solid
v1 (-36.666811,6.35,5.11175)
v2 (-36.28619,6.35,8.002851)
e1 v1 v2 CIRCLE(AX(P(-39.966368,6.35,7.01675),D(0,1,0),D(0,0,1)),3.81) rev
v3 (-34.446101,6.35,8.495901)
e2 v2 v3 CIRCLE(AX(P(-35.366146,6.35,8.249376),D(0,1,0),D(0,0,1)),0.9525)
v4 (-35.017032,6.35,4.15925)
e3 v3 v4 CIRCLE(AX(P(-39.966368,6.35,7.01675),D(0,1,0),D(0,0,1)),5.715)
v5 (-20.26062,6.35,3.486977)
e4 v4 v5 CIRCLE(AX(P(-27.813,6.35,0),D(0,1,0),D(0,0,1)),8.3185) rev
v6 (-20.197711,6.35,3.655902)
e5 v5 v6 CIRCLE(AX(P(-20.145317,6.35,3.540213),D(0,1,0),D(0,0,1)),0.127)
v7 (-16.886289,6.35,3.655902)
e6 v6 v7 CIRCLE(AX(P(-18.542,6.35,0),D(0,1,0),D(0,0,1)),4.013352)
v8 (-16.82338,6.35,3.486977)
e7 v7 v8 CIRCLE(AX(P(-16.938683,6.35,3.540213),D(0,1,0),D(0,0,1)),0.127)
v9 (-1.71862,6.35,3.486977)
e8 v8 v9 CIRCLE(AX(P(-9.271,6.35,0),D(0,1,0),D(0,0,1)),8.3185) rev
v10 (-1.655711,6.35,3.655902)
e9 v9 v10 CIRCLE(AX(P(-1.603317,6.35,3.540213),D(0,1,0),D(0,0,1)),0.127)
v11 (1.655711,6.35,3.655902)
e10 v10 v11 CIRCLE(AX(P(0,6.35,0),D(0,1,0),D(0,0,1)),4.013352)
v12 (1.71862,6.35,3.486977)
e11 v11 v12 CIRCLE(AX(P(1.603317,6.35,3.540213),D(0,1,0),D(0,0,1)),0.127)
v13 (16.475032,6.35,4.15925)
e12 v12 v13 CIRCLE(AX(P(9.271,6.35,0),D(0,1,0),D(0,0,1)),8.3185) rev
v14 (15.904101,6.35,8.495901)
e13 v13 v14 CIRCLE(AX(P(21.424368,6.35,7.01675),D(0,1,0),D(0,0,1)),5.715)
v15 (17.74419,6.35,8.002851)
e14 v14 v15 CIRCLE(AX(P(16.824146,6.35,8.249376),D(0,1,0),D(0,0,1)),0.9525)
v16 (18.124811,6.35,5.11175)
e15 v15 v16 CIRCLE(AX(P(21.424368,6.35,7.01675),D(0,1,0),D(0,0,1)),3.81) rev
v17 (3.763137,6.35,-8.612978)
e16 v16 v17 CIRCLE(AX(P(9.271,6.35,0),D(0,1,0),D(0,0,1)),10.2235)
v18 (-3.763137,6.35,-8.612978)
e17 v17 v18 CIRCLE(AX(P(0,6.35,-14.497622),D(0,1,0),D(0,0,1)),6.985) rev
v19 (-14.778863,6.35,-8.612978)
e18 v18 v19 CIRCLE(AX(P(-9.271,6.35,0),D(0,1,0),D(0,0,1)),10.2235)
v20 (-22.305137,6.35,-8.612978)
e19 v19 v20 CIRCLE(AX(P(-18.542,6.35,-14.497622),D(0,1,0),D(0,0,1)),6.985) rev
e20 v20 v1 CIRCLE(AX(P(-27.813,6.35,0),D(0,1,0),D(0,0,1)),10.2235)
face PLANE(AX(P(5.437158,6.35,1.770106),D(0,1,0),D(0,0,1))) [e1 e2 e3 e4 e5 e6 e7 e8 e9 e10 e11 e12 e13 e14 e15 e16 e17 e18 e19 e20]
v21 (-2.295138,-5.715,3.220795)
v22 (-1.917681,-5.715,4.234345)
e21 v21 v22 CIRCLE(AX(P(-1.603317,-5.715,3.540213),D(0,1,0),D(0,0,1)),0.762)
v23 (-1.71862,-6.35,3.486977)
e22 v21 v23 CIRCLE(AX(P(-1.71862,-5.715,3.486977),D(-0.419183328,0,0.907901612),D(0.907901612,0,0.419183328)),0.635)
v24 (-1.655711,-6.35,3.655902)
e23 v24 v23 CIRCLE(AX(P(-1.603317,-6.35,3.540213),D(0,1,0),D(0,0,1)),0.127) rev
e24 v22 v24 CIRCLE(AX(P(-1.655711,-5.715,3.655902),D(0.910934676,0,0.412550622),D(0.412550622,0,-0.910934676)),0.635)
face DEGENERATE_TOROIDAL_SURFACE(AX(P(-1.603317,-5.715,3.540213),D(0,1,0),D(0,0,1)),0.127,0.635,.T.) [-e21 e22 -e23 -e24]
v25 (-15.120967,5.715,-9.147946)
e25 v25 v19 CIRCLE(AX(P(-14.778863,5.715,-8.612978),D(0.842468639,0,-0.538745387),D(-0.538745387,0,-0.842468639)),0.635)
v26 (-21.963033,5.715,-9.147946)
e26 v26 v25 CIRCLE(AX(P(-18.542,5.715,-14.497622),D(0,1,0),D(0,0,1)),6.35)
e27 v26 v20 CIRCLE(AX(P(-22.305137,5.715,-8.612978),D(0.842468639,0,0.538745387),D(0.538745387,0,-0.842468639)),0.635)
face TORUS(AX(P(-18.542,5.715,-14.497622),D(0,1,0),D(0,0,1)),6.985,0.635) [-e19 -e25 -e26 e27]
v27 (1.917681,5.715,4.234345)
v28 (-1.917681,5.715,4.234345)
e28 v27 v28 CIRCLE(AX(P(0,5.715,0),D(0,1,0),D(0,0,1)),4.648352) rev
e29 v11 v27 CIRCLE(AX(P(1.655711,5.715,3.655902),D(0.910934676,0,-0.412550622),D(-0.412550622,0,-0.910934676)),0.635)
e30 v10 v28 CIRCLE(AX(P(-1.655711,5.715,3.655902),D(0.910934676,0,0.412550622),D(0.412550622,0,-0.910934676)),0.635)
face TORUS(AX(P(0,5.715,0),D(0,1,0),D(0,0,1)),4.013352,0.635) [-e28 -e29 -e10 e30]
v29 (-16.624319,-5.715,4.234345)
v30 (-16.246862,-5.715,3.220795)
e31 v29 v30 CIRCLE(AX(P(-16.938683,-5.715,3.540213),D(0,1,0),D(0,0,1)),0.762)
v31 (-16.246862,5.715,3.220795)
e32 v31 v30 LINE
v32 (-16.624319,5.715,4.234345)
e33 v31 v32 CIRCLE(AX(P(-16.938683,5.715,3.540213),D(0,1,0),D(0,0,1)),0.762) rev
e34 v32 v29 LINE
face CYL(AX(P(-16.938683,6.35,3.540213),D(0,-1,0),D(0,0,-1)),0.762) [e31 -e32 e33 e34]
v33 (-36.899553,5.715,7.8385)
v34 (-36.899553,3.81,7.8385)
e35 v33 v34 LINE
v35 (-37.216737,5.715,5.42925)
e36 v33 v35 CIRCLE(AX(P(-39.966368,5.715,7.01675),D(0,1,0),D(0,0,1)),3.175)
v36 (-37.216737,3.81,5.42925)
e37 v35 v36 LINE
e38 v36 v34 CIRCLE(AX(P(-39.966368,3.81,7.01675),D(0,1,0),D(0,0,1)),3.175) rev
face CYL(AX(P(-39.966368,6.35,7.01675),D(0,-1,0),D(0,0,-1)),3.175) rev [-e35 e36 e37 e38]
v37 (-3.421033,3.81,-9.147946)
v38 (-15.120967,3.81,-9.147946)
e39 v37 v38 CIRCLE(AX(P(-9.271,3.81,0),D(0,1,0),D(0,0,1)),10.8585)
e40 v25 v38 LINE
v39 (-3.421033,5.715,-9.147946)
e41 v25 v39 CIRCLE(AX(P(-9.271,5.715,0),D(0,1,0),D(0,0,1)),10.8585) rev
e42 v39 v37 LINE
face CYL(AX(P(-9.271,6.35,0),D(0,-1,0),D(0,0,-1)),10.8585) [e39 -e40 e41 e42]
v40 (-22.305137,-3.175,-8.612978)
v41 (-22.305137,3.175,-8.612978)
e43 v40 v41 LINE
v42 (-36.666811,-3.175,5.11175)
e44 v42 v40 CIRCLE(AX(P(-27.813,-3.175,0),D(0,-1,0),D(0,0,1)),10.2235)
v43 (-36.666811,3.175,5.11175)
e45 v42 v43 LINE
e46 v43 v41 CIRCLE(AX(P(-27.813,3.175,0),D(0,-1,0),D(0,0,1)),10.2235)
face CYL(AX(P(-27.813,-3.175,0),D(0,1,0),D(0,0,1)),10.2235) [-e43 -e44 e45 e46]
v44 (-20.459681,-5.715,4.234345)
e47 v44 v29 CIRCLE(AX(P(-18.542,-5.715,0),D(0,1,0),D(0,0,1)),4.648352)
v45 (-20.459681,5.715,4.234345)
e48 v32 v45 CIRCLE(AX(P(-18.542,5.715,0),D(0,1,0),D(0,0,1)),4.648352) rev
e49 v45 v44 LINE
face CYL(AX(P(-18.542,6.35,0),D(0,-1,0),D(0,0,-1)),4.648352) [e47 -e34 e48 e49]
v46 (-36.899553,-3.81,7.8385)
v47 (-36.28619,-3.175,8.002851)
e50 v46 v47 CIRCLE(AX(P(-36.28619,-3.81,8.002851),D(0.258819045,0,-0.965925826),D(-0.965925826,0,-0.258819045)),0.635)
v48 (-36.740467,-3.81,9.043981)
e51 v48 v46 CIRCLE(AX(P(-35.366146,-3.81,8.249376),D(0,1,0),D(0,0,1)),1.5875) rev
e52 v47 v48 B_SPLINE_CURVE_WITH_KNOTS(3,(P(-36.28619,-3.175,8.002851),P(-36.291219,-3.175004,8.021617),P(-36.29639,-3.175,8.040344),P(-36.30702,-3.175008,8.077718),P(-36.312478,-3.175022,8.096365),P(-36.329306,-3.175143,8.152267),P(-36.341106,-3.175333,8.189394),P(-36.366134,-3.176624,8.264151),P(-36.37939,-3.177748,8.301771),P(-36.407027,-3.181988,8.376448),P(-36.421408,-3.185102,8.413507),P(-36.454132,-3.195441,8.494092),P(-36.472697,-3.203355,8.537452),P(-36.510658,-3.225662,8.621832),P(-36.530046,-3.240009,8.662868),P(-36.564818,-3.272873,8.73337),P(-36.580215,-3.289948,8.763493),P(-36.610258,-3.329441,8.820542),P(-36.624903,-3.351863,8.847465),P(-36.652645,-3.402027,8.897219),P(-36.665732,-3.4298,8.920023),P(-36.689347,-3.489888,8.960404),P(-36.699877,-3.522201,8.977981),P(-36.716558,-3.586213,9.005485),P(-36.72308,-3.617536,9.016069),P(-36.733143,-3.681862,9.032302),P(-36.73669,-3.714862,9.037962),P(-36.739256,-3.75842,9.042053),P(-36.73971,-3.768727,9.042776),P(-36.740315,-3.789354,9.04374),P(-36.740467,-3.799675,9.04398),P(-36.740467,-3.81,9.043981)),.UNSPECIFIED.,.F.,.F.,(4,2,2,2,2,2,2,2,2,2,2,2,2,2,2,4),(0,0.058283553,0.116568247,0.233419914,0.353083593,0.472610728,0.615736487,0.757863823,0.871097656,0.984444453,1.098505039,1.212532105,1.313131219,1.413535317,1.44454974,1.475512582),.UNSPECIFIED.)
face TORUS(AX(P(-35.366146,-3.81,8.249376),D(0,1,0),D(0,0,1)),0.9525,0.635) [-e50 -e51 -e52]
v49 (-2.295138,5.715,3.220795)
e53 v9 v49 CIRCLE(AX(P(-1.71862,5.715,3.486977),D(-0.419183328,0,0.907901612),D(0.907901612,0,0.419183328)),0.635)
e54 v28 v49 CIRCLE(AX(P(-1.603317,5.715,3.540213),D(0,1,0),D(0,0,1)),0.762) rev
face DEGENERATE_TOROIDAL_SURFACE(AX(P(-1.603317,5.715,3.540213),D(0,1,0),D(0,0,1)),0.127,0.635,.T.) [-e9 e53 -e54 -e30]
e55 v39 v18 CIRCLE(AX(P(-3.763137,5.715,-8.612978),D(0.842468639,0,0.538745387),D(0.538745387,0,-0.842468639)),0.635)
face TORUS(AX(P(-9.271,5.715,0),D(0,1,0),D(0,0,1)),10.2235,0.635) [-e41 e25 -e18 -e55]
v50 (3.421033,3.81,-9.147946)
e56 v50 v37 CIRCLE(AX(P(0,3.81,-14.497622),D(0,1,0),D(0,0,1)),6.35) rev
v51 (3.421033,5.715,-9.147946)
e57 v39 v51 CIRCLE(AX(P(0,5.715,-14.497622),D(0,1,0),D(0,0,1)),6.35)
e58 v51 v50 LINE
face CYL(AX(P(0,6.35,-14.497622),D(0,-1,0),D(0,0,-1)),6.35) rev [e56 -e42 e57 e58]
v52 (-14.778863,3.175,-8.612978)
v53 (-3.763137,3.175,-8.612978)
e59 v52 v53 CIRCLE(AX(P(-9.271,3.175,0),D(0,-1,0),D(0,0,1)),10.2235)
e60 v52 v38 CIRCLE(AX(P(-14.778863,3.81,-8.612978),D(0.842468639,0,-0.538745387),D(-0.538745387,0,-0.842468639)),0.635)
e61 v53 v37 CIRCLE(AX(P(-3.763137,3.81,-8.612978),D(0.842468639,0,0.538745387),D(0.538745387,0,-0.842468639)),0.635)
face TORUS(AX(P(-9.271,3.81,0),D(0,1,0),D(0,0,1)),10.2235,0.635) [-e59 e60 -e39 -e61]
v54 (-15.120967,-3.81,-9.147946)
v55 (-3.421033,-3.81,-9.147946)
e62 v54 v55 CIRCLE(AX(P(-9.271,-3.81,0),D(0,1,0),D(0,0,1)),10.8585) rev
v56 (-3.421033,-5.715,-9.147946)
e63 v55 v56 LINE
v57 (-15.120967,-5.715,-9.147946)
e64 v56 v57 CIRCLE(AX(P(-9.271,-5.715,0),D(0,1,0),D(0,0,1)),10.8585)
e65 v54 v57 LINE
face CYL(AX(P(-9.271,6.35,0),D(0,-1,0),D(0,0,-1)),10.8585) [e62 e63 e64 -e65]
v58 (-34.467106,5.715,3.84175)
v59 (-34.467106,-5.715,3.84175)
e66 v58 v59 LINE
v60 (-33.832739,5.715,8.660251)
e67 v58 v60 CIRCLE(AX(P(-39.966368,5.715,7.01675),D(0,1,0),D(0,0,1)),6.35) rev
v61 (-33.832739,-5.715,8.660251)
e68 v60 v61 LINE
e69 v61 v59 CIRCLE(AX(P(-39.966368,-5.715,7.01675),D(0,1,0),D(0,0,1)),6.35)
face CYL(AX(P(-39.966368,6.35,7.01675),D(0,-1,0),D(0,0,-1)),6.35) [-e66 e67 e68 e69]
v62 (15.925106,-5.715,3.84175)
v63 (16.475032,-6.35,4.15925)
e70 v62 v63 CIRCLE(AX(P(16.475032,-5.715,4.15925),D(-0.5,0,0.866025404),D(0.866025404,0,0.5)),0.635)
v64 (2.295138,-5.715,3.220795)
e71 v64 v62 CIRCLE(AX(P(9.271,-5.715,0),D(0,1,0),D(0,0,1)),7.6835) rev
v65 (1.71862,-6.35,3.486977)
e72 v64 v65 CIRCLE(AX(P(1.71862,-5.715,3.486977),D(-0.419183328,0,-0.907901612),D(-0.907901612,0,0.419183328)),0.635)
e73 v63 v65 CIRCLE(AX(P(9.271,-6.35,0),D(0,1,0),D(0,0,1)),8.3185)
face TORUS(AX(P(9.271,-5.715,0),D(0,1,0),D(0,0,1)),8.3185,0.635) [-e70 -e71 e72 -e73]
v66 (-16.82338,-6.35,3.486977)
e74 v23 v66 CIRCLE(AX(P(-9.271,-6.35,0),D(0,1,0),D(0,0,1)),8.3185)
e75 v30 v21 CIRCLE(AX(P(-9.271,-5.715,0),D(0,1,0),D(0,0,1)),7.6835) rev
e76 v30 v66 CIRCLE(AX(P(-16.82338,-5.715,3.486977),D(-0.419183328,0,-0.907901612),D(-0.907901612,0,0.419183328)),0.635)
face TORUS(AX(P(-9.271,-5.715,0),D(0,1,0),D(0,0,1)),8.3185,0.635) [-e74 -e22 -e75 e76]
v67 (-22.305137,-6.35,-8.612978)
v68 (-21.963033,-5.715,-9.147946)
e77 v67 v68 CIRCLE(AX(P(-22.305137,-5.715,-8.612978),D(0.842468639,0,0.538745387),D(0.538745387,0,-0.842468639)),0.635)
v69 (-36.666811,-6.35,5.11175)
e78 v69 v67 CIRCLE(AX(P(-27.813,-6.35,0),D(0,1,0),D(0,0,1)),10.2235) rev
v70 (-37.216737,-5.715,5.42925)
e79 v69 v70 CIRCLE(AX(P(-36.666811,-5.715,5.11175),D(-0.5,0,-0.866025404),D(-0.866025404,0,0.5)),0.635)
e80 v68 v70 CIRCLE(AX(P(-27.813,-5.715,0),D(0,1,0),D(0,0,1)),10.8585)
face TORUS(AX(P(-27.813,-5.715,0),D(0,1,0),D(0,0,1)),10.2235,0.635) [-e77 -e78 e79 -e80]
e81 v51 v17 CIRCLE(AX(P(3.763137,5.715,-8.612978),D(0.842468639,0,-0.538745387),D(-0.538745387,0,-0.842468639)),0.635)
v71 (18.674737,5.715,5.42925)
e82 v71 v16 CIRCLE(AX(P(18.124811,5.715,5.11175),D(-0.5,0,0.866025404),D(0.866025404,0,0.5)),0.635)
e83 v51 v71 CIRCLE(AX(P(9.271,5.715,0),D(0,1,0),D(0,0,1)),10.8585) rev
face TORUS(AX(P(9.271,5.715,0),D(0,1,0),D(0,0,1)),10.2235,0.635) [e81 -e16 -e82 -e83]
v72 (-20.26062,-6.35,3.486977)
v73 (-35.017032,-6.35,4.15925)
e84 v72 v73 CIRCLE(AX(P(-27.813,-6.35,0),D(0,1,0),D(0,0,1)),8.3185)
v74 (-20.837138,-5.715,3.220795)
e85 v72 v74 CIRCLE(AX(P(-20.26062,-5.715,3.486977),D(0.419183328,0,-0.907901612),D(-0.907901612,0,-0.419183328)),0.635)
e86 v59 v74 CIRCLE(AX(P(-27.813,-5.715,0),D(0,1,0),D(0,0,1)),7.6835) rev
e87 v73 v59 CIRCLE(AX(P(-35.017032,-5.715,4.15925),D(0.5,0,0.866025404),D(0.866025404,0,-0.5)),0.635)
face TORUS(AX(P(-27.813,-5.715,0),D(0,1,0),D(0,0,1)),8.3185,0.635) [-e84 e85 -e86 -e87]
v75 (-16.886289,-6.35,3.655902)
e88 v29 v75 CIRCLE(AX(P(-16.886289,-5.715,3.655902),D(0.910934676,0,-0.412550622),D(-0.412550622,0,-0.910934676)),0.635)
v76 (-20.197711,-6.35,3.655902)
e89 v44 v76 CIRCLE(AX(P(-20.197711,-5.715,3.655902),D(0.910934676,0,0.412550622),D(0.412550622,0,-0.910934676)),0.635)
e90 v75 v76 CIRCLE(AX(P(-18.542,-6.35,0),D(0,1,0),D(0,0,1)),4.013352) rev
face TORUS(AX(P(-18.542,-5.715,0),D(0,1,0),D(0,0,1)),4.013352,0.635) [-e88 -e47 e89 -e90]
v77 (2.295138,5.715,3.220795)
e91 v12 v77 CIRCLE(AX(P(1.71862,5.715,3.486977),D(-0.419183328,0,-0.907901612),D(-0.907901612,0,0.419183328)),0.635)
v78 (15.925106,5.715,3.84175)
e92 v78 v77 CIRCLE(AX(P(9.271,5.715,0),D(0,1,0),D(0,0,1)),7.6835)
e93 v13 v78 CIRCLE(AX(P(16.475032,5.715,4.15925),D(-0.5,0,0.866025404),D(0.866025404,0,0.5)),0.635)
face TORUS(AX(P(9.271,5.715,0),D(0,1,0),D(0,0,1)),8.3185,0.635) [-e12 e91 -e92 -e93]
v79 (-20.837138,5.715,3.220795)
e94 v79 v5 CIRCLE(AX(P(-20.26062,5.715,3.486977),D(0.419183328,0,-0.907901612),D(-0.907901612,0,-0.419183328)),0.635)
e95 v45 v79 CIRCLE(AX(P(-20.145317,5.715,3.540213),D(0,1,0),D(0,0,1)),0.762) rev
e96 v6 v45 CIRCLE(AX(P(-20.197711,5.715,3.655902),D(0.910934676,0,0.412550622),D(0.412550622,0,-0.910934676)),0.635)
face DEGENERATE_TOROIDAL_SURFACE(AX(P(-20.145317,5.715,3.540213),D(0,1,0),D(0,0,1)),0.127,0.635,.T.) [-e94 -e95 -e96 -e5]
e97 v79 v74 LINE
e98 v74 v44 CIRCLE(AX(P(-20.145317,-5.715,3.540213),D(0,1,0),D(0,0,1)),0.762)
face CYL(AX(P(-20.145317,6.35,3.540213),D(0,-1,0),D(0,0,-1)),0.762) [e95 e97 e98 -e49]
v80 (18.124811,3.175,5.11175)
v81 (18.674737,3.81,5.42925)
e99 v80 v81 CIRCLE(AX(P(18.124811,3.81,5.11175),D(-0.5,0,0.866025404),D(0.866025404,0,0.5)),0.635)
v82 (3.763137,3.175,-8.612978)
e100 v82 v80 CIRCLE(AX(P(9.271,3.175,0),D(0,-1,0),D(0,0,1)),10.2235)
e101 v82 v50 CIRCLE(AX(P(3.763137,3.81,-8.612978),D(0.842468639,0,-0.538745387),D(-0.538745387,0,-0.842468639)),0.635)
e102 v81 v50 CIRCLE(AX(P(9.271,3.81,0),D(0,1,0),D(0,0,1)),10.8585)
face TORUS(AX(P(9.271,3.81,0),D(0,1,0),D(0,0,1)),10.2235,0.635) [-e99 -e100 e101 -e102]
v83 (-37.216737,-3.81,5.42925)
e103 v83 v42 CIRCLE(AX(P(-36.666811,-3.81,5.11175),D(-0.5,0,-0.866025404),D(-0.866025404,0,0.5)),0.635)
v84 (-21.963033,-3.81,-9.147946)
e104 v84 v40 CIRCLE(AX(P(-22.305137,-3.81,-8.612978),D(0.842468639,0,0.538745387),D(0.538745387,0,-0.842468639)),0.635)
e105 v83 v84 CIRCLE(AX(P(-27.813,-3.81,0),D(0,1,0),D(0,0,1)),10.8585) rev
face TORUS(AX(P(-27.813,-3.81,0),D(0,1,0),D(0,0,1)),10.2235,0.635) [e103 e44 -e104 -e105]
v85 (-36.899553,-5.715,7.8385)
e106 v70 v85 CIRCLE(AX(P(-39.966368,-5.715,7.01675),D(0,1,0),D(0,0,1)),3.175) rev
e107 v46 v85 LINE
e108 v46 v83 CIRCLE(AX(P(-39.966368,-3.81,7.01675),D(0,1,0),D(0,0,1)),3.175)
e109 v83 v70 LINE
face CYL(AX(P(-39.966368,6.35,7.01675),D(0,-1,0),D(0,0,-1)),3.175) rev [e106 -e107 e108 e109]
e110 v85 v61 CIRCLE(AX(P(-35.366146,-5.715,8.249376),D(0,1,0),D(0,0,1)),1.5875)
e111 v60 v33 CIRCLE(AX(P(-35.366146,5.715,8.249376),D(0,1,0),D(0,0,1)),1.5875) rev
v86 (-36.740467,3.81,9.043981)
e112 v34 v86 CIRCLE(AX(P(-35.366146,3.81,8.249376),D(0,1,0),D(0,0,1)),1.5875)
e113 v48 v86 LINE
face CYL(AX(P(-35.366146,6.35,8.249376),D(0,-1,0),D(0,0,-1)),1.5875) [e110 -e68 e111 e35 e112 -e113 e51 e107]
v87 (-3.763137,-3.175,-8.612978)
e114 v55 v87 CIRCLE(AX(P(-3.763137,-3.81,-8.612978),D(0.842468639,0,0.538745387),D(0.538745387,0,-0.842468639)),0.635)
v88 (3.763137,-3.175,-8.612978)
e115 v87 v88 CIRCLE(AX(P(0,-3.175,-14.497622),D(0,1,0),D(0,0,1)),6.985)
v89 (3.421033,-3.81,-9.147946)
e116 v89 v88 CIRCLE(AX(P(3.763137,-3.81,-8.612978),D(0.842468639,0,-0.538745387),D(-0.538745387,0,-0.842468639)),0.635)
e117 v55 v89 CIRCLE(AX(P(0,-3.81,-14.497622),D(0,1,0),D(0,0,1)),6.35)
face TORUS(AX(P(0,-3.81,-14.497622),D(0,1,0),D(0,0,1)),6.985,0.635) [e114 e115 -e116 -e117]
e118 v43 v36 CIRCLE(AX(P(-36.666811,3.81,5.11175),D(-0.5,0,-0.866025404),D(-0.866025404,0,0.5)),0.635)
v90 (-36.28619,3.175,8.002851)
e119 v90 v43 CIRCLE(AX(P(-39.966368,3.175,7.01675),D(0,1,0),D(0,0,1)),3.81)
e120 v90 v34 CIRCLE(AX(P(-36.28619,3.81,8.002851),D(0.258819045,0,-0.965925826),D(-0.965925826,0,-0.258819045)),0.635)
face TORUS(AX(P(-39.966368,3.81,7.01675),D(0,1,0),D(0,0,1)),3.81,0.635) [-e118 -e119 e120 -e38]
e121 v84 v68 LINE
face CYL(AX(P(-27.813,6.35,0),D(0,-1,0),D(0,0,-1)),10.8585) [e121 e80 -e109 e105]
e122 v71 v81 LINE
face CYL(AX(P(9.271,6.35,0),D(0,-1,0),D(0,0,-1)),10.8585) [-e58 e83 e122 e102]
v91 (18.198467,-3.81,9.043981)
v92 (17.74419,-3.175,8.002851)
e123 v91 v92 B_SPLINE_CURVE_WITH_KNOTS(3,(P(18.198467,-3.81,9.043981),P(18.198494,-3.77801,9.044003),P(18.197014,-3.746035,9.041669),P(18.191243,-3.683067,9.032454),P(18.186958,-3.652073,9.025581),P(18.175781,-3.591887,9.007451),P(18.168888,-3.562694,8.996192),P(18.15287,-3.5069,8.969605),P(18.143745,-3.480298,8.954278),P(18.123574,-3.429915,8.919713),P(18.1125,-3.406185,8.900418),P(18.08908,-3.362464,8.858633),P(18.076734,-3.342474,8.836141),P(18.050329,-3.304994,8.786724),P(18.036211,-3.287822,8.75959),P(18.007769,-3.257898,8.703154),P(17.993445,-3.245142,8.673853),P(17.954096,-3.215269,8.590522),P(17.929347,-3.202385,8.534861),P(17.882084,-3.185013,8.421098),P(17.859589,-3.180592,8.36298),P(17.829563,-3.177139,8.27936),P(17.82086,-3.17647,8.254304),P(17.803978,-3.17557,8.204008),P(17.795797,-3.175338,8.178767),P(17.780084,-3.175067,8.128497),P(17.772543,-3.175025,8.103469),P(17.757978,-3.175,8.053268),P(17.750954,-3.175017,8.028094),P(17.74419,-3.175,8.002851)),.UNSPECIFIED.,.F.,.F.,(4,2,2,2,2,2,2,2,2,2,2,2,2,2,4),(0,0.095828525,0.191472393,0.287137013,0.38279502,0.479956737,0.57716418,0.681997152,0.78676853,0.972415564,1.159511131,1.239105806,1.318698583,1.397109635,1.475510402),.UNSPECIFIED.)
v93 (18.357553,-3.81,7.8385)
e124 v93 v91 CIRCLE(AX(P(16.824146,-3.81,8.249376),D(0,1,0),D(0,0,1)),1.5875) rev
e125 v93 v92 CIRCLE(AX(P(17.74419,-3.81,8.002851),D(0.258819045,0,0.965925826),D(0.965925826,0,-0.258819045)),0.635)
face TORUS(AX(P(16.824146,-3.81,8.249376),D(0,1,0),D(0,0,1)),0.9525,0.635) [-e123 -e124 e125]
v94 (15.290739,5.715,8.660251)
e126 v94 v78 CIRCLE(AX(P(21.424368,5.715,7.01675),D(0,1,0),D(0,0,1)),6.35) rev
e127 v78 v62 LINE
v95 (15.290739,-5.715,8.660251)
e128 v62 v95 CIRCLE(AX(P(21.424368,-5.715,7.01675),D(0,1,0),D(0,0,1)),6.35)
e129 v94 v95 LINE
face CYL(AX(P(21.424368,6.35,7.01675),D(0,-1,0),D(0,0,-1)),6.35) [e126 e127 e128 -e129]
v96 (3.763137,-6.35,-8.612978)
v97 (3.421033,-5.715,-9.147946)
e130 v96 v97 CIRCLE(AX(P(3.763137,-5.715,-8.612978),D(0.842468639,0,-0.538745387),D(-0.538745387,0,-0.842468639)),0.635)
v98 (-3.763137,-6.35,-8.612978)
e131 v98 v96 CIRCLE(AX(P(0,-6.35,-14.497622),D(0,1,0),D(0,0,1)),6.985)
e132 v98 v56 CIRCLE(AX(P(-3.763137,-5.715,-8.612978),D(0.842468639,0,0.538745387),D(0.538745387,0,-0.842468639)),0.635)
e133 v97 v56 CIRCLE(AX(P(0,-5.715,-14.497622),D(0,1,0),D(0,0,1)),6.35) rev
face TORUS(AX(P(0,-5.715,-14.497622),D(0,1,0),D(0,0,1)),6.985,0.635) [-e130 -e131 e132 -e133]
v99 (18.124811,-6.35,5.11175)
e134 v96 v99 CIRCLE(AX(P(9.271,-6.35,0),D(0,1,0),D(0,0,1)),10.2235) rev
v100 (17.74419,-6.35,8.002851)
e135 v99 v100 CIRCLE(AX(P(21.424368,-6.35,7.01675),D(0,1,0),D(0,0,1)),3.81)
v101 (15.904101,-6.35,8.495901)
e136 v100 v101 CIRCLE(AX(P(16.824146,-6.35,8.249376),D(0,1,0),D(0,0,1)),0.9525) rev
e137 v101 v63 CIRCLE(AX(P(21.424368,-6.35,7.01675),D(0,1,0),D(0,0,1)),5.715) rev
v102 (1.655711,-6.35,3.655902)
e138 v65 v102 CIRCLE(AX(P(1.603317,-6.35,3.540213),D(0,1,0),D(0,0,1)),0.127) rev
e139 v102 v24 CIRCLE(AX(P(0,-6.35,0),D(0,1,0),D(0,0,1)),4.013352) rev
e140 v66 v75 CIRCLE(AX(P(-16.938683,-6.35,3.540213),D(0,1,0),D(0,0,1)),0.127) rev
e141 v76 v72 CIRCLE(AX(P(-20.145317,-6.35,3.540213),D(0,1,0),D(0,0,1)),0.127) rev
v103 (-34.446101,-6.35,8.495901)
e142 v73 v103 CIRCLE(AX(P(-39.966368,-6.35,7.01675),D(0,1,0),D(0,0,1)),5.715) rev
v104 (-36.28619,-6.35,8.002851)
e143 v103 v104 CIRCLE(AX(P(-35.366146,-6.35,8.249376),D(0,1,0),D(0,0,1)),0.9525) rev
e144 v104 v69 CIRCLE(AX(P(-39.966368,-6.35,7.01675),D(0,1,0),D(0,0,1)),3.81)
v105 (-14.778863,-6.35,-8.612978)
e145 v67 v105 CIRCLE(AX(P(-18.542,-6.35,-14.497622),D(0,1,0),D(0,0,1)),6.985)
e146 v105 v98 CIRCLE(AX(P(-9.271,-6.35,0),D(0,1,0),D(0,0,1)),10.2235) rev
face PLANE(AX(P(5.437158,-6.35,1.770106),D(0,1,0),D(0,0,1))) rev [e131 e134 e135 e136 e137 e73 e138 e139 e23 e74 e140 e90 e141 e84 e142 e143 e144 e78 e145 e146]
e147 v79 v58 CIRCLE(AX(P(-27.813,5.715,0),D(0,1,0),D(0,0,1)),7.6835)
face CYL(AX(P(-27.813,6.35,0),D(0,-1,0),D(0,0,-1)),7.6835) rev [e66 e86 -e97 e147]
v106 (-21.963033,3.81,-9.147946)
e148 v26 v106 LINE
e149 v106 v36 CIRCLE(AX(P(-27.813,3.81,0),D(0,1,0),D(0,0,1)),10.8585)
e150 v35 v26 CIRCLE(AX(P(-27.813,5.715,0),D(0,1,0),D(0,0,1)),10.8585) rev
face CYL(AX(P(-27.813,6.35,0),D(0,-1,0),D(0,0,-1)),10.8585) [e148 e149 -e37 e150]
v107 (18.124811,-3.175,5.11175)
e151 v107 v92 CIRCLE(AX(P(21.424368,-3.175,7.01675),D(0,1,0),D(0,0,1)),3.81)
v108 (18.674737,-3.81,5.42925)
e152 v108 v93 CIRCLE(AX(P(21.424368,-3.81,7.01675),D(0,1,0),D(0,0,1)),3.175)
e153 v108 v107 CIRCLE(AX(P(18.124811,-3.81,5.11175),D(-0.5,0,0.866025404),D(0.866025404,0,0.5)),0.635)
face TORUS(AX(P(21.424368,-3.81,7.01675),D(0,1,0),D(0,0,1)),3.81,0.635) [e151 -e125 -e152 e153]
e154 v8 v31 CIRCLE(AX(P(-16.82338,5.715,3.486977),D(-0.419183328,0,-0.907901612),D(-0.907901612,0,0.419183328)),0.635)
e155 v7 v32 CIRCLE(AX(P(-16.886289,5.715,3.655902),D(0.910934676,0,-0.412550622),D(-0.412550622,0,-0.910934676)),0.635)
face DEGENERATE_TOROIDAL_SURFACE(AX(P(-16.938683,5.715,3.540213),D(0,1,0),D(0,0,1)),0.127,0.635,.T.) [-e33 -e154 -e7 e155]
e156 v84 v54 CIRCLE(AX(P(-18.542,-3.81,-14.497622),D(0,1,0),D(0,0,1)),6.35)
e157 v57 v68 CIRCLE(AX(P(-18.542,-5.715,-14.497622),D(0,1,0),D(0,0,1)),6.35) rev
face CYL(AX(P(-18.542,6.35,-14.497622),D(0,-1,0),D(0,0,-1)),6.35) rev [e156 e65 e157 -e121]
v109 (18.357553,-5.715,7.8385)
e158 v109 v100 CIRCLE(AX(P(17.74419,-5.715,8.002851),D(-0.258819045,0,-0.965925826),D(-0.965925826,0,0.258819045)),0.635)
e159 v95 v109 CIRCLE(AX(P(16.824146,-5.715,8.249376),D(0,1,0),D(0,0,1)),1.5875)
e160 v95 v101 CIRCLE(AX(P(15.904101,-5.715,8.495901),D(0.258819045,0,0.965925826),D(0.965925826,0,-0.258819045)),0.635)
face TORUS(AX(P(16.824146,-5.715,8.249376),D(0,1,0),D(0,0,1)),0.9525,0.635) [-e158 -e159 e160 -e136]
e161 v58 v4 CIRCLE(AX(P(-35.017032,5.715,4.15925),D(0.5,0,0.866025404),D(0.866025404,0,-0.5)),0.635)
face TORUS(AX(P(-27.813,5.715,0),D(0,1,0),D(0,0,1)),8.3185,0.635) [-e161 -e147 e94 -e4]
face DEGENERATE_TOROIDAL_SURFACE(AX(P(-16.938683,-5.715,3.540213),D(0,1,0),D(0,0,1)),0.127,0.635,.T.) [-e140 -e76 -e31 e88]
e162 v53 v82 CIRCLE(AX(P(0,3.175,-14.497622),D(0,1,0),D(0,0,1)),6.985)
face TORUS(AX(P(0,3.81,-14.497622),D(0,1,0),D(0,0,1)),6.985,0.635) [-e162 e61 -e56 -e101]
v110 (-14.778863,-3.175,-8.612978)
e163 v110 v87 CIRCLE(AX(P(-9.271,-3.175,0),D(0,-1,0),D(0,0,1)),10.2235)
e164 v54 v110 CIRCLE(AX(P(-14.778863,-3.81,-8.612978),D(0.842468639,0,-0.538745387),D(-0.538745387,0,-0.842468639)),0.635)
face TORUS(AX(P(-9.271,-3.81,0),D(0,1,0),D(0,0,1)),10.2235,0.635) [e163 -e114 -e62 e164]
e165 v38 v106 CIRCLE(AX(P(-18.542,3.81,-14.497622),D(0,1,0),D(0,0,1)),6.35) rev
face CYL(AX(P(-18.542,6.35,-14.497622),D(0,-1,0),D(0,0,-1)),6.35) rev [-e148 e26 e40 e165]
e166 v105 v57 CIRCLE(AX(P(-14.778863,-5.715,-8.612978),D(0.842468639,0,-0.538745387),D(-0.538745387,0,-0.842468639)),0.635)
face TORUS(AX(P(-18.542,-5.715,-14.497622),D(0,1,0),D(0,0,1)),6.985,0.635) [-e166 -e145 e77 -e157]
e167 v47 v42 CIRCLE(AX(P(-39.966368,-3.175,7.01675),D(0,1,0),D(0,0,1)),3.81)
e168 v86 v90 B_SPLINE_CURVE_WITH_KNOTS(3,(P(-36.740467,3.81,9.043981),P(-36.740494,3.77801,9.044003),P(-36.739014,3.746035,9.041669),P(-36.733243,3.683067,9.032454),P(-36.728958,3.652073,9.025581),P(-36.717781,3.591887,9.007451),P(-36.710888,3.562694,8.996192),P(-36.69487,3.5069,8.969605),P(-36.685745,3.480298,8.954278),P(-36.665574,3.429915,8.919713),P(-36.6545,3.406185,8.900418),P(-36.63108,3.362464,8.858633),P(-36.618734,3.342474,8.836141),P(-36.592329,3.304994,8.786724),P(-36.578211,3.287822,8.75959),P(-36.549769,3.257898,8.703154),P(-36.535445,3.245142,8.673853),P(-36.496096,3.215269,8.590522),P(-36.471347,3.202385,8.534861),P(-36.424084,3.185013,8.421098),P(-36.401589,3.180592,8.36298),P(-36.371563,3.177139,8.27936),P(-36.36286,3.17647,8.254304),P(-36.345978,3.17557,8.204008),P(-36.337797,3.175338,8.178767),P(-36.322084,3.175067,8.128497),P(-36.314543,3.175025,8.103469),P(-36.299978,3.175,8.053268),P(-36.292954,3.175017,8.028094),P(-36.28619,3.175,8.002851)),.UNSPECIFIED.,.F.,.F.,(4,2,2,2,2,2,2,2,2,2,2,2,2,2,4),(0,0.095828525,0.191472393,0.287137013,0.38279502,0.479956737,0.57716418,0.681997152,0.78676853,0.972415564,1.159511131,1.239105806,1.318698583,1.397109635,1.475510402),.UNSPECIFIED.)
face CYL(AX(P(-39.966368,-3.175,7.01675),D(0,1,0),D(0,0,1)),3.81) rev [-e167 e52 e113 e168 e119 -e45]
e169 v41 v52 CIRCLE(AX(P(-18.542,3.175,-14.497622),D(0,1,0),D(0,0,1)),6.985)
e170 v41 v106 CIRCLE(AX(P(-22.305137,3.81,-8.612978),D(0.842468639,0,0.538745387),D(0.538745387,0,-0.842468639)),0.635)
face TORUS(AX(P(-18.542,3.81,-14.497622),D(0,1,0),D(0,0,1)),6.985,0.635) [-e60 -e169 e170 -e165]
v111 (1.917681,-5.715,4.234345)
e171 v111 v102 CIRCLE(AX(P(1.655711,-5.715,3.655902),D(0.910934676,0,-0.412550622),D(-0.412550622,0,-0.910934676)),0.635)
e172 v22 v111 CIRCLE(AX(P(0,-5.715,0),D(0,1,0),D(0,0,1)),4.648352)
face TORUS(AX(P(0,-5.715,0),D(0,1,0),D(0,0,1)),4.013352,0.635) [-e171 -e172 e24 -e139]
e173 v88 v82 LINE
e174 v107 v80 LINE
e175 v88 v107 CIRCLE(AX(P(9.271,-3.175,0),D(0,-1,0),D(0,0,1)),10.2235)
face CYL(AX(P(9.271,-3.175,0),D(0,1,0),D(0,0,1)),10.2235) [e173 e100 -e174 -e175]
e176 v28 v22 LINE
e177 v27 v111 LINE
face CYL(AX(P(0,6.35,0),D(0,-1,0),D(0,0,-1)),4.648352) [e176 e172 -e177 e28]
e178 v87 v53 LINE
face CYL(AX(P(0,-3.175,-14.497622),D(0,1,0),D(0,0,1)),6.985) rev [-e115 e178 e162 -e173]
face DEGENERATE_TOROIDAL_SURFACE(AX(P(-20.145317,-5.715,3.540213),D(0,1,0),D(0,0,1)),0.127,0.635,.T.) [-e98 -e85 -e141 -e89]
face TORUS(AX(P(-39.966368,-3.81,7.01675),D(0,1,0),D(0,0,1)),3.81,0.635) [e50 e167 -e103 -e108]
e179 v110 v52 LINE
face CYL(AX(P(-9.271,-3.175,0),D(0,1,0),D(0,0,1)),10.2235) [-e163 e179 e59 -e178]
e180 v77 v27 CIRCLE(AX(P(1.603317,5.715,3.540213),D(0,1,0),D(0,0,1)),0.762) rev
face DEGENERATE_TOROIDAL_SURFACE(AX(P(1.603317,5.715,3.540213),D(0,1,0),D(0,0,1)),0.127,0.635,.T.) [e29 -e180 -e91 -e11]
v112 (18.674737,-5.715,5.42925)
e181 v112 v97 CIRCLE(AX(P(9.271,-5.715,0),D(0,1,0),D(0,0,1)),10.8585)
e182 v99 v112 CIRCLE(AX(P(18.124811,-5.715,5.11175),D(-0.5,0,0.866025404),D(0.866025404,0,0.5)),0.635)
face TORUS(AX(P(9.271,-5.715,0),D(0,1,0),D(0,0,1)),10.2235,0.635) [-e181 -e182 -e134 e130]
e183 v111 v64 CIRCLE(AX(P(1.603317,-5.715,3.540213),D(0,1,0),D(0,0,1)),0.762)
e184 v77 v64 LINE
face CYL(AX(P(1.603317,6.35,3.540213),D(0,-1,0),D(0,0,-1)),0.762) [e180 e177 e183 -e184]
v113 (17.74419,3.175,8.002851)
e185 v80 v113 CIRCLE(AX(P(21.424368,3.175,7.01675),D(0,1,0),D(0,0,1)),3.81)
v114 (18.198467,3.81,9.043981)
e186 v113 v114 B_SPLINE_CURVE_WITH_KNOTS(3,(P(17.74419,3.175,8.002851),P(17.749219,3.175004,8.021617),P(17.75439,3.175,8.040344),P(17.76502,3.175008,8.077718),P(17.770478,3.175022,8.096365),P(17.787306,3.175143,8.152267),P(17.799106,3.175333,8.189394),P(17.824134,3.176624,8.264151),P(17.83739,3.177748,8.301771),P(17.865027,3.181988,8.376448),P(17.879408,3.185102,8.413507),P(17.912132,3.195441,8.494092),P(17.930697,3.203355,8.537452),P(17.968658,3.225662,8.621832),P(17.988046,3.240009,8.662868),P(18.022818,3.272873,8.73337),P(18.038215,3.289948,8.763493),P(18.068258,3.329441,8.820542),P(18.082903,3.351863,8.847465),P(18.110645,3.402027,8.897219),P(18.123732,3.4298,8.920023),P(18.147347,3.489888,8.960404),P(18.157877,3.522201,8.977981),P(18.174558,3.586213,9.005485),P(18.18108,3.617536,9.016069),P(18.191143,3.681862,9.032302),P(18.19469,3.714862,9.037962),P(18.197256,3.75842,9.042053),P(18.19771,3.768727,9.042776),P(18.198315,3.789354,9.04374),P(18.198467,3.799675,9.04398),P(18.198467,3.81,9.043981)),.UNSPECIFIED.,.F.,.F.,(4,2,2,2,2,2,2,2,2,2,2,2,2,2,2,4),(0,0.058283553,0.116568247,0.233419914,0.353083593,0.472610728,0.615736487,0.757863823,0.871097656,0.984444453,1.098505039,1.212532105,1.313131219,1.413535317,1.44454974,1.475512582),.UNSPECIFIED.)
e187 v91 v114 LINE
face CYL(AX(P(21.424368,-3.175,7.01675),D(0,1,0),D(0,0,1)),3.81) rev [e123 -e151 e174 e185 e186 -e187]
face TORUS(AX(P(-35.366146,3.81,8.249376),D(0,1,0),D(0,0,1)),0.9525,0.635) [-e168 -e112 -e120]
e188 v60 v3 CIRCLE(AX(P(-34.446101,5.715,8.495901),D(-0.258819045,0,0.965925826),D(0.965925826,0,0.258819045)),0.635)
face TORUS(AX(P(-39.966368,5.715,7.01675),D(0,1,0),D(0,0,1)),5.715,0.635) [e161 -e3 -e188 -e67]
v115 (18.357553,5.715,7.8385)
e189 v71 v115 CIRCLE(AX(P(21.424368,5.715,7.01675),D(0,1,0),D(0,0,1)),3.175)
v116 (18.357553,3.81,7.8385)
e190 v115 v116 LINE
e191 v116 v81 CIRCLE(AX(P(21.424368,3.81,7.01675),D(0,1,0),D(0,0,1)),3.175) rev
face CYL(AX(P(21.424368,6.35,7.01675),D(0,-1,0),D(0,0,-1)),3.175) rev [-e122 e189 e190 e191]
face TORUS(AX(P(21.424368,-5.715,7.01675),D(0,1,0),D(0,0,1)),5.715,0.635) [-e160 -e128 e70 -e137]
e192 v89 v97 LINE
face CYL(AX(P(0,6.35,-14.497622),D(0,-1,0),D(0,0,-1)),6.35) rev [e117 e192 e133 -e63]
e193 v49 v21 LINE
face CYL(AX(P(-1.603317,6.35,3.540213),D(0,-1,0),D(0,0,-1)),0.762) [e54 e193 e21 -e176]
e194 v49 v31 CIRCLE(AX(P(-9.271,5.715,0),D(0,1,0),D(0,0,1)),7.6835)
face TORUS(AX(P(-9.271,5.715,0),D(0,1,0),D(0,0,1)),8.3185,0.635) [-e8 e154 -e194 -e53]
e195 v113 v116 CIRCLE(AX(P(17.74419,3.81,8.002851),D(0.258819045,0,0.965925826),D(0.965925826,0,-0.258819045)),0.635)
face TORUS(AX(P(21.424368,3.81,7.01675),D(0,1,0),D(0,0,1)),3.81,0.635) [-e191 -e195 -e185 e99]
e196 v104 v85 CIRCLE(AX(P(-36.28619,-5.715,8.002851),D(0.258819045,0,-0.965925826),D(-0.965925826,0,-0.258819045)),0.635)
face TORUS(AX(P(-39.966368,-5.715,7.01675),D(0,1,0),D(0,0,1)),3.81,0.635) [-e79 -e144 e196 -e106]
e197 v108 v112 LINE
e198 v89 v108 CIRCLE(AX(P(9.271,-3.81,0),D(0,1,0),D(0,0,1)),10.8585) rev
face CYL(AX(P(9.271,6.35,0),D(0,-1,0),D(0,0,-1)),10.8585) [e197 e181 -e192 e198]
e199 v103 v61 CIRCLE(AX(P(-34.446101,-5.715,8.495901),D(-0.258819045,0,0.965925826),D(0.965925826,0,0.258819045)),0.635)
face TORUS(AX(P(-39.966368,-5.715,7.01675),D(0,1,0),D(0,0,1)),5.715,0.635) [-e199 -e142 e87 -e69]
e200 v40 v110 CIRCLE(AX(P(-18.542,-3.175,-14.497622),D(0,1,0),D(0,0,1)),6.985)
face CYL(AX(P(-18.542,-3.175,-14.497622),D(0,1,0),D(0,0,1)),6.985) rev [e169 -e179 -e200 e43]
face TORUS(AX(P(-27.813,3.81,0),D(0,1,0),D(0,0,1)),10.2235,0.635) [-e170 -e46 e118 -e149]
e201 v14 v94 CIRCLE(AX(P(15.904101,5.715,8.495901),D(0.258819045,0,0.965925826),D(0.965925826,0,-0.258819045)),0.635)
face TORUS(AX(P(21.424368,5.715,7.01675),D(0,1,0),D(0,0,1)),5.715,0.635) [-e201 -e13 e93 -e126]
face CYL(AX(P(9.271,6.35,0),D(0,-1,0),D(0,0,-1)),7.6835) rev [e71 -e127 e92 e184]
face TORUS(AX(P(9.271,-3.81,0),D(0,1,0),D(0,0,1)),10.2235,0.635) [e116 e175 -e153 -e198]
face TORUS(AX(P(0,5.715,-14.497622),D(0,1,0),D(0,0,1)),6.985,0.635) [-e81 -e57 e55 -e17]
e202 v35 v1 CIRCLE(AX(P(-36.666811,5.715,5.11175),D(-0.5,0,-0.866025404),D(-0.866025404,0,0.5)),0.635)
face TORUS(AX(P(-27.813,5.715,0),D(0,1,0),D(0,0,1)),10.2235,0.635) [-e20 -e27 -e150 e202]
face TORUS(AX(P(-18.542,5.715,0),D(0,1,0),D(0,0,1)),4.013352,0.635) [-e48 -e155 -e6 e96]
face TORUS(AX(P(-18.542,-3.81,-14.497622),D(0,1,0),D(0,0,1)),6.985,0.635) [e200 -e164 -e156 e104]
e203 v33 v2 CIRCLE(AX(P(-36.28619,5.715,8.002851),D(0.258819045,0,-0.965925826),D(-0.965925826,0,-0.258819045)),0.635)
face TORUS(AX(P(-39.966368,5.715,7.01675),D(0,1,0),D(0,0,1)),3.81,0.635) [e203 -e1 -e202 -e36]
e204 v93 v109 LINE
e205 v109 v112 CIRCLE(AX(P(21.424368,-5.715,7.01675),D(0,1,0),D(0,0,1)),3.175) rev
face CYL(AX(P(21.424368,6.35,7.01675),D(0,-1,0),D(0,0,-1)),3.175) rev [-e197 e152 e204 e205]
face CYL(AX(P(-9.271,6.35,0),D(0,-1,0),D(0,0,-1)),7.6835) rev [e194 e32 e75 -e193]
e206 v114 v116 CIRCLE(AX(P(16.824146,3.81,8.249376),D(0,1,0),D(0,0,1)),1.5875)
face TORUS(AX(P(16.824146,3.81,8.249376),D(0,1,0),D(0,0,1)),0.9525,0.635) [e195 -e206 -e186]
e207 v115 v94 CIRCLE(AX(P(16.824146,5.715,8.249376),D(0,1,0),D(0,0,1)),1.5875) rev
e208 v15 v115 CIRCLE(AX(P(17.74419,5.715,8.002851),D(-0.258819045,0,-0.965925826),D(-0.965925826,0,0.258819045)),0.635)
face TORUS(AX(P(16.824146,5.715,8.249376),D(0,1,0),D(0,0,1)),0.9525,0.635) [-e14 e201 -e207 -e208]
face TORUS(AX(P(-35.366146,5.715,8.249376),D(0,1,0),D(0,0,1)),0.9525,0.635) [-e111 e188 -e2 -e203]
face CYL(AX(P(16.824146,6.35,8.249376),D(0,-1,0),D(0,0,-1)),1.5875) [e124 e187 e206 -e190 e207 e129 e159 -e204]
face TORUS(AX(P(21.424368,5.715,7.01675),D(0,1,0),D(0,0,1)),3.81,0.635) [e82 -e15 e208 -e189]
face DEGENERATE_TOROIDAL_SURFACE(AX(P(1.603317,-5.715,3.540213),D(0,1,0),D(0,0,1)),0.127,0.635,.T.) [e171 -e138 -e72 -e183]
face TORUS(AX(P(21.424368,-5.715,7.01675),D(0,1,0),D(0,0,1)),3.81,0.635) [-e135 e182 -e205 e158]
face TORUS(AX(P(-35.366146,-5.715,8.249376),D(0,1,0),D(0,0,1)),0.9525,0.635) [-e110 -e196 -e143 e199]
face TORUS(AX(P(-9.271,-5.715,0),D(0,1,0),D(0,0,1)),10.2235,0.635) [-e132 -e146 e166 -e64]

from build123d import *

# Parameters (mm, degrees)
BOSS_EXTRUDE1_DEPTH = 6.35
FILLET1_R           = 0.635
CUT_EXTRUDE1_DEPTH  = 3.175
FILLET2_R           = 0.635


with BuildPart() as part:
    # Sketch1 → Boss-Extrude1 (new, symmetric)
    with BuildSketch(Plane(origin=(0, 0, 0), x_dir=(1, 0, 0), z_dir=(0, 1, 0))):
        with BuildLine():
            ThreePointArc((15.92510619, -3.84175), (9.620682646, 7.675538697), (2.295137962, -3.220795101))
            ThreePointArc((2.295137962, -3.220795101), (2.31740567, -3.806147519), (1.917680508, -4.23434502))
            ThreePointArc((1.917680508, -4.23434502), (0, -4.648351996), (-1.917680508, -4.23434502))
            ThreePointArc((-1.917680508, -4.23434502), (-2.31740567, -3.806147519), (-2.295137962, -3.220795101))
            ThreePointArc((-2.295137962, -3.220795101), (-7.622191903, 7.504505587), (-16.9545, 0))
            ThreePointArc((-16.9545, 0), (-16.775505587, -1.648808097), (-16.246862038, -3.220795101))
            ThreePointArc((-16.246862038, -3.220795101), (-16.22459433, -3.806147519), (-16.624319492, -4.23434502))
            ThreePointArc((-16.624319492, -4.23434502), (-18.542, -4.648351996), (-20.459680508, -4.23434502))
            ThreePointArc((-20.459680508, -4.23434502), (-20.85940567, -3.806147519), (-20.837137962, -3.220795101))
            ThreePointArc((-20.837137962, -3.220795101), (-28.162682646, 7.675538697), (-34.46710619, -3.84175))
            ThreePointArc((-34.46710619, -3.84175), (-33.670692634, -6.187908679), (-33.832738507, -8.660250936))
            ThreePointArc((-33.832738507, -8.660250936), (-35.77702099, -9.782782952), (-36.899553006, -7.838500468))
            ThreePointArc((-36.899553006, -7.838500468), (-36.818530069, -6.60232934), (-37.216736847, -5.42925))
            ThreePointArc((-37.216736847, -5.42925), (-35.315064991, 7.850225673), (-21.96303321, 9.147945715))
            ThreePointArc((-21.96303321, 9.147945715), (-18.542, 8.147621572), (-15.12096679, 9.147945715))
            ThreePointArc((-15.12096679, 9.147945715), (-9.271, 10.8585), (-3.42103321, 9.147945715))
            ThreePointArc((-3.42103321, 9.147945715), (0, 8.147621572), (3.42103321, 9.147945715))
            ThreePointArc((3.42103321, 9.147945715), (16.773064991, 7.850225673), (18.674736847, -5.42925))
            ThreePointArc((18.674736847, -5.42925), (18.276530069, -6.60232934), (18.357553006, -7.838500468))
            ThreePointArc((18.357553006, -7.838500468), (17.23502099, -9.782782952), (15.290738507, -8.660250936))
            ThreePointArc((15.290738507, -8.660250936), (15.128692634, -6.187908679), (15.92510619, -3.84175))
        make_face()
    extrude(amount=BOSS_EXTRUDE1_DEPTH, both=True)

    # Fillet1
    fillet1_edges = [part.edges().sort_by_distance(p)[0] for p in [
        (15.128692634, 6.35, 6.187908679),
        (17.23502099, 6.35, 9.782782952),
        (0, -6.35, 4.648351996),
        (-2.31740567, -6.35, 3.806147519),
        (18.276530069, 6.35, 6.60232934),
        (-9.271, -6.35, -7.6835),
        (-16.22459433, -6.35, 3.806147519),
        (-18.542, -6.35, 4.648351996),
        (-20.85940567, -6.35, 3.806147519),
        (-28.162682646, -6.35, -7.675538697),
        (-33.670692634, -6.35, 6.187908679),
        (-35.77702099, -6.35, 9.782782952),
        (-36.818530069, -6.35, 6.60232934),
        (-35.315064991, -6.35, -7.850225673),
        (16.773064991, 6.35, -7.850225673),
        (-18.542, -6.35, -8.147621572),
        (-9.271, -6.35, -10.8585),
        (0, -6.35, -8.147621572),
        (16.773064991, -6.35, -7.850225673),
        (18.276530069, -6.35, 6.60232934),
        (17.23502099, -6.35, 9.782782952),
        (15.128692634, -6.35, 6.187908679),
        (9.620682646, -6.35, -7.675538697),
        (2.31740567, -6.35, 3.806147519),
        (0, 6.35, -8.147621572),
        (-9.271, 6.35, -10.8585),
        (-18.542, 6.35, -8.147621572),
        (-35.315064991, 6.35, -7.850225673),
        (-36.818530069, 6.35, 6.60232934),
        (-35.77702099, 6.35, 9.782782952),
        (2.31740567, 6.35, 3.806147519),
        (-33.670692634, 6.35, 6.187908679),
        (-28.162682646, 6.35, -7.675538697),
        (-20.85940567, 6.35, 3.806147519),
        (-18.542, 6.35, 4.648351996),
        (-16.22459433, 6.35, 3.806147519),
        (-9.271, 6.35, -7.6835),
        (-2.31740567, 6.35, 3.806147519),
        (0, 6.35, 4.648351996),
        (9.620682646, 6.35, -7.675538697),
    ]]
    fillet(fillet1_edges, radius=FILLET1_R)

    # Sketch2 → Cut-Extrude1 (cut, symmetric)
    with BuildSketch(Plane(origin=(0, 0, 0), x_dir=(1, 0, 0), z_dir=(0, 1, 0))):
        with BuildLine():
            ThreePointArc((18.124810716, -5.11175), (17.615035727, -7.088104139), (18.19846693, -9.043980989))
            ThreePointArc((18.19846693, -9.043980989), (18.397999932, -8.457075686), (18.357553006, -7.838500468))
            ThreePointArc((18.357553006, -7.838500468), (18.276530069, -6.60232934), (18.674736847, -5.42925))
            ThreePointArc((18.674736847, -5.42925), (16.773064991, 7.850225673), (3.42103321, 9.147945715))
            ThreePointArc((3.42103321, 9.147945715), (0, 8.147621572), (-3.42103321, 9.147945715))
            ThreePointArc((-3.42103321, 9.147945715), (-9.271, 10.8585), (-15.12096679, 9.147945715))
            ThreePointArc((-15.12096679, 9.147945715), (-18.542, 8.147621572), (-21.96303321, 9.147945715))
            ThreePointArc((-21.96303321, 9.147945715), (-35.315064991, 7.850225673), (-37.216736847, -5.42925))
            ThreePointArc((-37.216736847, -5.42925), (-36.818530069, -6.60232934), (-36.899553006, -7.838500468))
            ThreePointArc((-36.899553006, -7.838500468), (-36.939999932, -8.457075686), (-36.74046693, -9.043980989))
            ThreePointArc((-36.74046693, -9.043980989), (-36.157035727, -7.088104139), (-36.666810716, -5.11175))
            ThreePointArc((-36.666810716, -5.11175), (-34.87634774, 7.391148148), (-22.305136531, 8.61297813))
            ThreePointArc((-22.305136531, 8.61297813), (-18.542, 7.512621572), (-14.778863469, 8.61297813))
            ThreePointArc((-14.778863469, 8.61297813), (-9.271, 10.2235), (-3.763136531, 8.61297813))
            ThreePointArc((-3.763136531, 8.61297813), (0, 7.512621572), (3.763136531, 8.61297813))
            ThreePointArc((3.763136531, 8.61297813), (16.33434774, 7.391148148), (18.124810716, -5.11175))
        make_face()
    extrude(amount=CUT_EXTRUDE1_DEPTH, both=True, mode=Mode.SUBTRACT)

    # Fillet2
    fillet2_edges = [part.edges().sort_by_distance(p)[0] for p in [
        (0, -3.175, -8.147621572),
        (16.773064991, -3.175, -7.850225673),
        (18.276530069, -3.175, 6.60232934),
        (18.397999932, -3.175, 8.457075686),
        (-36.939999932, -3.175, 8.457075686),
        (-36.818530069, -3.175, 6.60232934),
        (-35.315064991, -3.175, -7.850225673),
        (-18.542, -3.175, -8.147621572),
        (-9.271, -3.175, -10.8585),
        (0, 3.175, -8.147621572),
        (-9.271, 3.175, -10.8585),
        (-18.542, 3.175, -8.147621572),
        (-35.315064991, 3.175, -7.850225673),
        (-36.818530069, 3.175, 6.60232934),
        (-36.939999932, 3.175, 8.457075686),
        (18.397999932, 3.175, 8.457075686),
        (18.276530069, 3.175, 6.60232934),
        (16.773064991, 3.175, -7.850225673),
    ]]
    fillet(fillet2_edges, radius=FILLET2_R - 0.0001)  # a hair under: the kernel refuses the full size


solid = part.part
